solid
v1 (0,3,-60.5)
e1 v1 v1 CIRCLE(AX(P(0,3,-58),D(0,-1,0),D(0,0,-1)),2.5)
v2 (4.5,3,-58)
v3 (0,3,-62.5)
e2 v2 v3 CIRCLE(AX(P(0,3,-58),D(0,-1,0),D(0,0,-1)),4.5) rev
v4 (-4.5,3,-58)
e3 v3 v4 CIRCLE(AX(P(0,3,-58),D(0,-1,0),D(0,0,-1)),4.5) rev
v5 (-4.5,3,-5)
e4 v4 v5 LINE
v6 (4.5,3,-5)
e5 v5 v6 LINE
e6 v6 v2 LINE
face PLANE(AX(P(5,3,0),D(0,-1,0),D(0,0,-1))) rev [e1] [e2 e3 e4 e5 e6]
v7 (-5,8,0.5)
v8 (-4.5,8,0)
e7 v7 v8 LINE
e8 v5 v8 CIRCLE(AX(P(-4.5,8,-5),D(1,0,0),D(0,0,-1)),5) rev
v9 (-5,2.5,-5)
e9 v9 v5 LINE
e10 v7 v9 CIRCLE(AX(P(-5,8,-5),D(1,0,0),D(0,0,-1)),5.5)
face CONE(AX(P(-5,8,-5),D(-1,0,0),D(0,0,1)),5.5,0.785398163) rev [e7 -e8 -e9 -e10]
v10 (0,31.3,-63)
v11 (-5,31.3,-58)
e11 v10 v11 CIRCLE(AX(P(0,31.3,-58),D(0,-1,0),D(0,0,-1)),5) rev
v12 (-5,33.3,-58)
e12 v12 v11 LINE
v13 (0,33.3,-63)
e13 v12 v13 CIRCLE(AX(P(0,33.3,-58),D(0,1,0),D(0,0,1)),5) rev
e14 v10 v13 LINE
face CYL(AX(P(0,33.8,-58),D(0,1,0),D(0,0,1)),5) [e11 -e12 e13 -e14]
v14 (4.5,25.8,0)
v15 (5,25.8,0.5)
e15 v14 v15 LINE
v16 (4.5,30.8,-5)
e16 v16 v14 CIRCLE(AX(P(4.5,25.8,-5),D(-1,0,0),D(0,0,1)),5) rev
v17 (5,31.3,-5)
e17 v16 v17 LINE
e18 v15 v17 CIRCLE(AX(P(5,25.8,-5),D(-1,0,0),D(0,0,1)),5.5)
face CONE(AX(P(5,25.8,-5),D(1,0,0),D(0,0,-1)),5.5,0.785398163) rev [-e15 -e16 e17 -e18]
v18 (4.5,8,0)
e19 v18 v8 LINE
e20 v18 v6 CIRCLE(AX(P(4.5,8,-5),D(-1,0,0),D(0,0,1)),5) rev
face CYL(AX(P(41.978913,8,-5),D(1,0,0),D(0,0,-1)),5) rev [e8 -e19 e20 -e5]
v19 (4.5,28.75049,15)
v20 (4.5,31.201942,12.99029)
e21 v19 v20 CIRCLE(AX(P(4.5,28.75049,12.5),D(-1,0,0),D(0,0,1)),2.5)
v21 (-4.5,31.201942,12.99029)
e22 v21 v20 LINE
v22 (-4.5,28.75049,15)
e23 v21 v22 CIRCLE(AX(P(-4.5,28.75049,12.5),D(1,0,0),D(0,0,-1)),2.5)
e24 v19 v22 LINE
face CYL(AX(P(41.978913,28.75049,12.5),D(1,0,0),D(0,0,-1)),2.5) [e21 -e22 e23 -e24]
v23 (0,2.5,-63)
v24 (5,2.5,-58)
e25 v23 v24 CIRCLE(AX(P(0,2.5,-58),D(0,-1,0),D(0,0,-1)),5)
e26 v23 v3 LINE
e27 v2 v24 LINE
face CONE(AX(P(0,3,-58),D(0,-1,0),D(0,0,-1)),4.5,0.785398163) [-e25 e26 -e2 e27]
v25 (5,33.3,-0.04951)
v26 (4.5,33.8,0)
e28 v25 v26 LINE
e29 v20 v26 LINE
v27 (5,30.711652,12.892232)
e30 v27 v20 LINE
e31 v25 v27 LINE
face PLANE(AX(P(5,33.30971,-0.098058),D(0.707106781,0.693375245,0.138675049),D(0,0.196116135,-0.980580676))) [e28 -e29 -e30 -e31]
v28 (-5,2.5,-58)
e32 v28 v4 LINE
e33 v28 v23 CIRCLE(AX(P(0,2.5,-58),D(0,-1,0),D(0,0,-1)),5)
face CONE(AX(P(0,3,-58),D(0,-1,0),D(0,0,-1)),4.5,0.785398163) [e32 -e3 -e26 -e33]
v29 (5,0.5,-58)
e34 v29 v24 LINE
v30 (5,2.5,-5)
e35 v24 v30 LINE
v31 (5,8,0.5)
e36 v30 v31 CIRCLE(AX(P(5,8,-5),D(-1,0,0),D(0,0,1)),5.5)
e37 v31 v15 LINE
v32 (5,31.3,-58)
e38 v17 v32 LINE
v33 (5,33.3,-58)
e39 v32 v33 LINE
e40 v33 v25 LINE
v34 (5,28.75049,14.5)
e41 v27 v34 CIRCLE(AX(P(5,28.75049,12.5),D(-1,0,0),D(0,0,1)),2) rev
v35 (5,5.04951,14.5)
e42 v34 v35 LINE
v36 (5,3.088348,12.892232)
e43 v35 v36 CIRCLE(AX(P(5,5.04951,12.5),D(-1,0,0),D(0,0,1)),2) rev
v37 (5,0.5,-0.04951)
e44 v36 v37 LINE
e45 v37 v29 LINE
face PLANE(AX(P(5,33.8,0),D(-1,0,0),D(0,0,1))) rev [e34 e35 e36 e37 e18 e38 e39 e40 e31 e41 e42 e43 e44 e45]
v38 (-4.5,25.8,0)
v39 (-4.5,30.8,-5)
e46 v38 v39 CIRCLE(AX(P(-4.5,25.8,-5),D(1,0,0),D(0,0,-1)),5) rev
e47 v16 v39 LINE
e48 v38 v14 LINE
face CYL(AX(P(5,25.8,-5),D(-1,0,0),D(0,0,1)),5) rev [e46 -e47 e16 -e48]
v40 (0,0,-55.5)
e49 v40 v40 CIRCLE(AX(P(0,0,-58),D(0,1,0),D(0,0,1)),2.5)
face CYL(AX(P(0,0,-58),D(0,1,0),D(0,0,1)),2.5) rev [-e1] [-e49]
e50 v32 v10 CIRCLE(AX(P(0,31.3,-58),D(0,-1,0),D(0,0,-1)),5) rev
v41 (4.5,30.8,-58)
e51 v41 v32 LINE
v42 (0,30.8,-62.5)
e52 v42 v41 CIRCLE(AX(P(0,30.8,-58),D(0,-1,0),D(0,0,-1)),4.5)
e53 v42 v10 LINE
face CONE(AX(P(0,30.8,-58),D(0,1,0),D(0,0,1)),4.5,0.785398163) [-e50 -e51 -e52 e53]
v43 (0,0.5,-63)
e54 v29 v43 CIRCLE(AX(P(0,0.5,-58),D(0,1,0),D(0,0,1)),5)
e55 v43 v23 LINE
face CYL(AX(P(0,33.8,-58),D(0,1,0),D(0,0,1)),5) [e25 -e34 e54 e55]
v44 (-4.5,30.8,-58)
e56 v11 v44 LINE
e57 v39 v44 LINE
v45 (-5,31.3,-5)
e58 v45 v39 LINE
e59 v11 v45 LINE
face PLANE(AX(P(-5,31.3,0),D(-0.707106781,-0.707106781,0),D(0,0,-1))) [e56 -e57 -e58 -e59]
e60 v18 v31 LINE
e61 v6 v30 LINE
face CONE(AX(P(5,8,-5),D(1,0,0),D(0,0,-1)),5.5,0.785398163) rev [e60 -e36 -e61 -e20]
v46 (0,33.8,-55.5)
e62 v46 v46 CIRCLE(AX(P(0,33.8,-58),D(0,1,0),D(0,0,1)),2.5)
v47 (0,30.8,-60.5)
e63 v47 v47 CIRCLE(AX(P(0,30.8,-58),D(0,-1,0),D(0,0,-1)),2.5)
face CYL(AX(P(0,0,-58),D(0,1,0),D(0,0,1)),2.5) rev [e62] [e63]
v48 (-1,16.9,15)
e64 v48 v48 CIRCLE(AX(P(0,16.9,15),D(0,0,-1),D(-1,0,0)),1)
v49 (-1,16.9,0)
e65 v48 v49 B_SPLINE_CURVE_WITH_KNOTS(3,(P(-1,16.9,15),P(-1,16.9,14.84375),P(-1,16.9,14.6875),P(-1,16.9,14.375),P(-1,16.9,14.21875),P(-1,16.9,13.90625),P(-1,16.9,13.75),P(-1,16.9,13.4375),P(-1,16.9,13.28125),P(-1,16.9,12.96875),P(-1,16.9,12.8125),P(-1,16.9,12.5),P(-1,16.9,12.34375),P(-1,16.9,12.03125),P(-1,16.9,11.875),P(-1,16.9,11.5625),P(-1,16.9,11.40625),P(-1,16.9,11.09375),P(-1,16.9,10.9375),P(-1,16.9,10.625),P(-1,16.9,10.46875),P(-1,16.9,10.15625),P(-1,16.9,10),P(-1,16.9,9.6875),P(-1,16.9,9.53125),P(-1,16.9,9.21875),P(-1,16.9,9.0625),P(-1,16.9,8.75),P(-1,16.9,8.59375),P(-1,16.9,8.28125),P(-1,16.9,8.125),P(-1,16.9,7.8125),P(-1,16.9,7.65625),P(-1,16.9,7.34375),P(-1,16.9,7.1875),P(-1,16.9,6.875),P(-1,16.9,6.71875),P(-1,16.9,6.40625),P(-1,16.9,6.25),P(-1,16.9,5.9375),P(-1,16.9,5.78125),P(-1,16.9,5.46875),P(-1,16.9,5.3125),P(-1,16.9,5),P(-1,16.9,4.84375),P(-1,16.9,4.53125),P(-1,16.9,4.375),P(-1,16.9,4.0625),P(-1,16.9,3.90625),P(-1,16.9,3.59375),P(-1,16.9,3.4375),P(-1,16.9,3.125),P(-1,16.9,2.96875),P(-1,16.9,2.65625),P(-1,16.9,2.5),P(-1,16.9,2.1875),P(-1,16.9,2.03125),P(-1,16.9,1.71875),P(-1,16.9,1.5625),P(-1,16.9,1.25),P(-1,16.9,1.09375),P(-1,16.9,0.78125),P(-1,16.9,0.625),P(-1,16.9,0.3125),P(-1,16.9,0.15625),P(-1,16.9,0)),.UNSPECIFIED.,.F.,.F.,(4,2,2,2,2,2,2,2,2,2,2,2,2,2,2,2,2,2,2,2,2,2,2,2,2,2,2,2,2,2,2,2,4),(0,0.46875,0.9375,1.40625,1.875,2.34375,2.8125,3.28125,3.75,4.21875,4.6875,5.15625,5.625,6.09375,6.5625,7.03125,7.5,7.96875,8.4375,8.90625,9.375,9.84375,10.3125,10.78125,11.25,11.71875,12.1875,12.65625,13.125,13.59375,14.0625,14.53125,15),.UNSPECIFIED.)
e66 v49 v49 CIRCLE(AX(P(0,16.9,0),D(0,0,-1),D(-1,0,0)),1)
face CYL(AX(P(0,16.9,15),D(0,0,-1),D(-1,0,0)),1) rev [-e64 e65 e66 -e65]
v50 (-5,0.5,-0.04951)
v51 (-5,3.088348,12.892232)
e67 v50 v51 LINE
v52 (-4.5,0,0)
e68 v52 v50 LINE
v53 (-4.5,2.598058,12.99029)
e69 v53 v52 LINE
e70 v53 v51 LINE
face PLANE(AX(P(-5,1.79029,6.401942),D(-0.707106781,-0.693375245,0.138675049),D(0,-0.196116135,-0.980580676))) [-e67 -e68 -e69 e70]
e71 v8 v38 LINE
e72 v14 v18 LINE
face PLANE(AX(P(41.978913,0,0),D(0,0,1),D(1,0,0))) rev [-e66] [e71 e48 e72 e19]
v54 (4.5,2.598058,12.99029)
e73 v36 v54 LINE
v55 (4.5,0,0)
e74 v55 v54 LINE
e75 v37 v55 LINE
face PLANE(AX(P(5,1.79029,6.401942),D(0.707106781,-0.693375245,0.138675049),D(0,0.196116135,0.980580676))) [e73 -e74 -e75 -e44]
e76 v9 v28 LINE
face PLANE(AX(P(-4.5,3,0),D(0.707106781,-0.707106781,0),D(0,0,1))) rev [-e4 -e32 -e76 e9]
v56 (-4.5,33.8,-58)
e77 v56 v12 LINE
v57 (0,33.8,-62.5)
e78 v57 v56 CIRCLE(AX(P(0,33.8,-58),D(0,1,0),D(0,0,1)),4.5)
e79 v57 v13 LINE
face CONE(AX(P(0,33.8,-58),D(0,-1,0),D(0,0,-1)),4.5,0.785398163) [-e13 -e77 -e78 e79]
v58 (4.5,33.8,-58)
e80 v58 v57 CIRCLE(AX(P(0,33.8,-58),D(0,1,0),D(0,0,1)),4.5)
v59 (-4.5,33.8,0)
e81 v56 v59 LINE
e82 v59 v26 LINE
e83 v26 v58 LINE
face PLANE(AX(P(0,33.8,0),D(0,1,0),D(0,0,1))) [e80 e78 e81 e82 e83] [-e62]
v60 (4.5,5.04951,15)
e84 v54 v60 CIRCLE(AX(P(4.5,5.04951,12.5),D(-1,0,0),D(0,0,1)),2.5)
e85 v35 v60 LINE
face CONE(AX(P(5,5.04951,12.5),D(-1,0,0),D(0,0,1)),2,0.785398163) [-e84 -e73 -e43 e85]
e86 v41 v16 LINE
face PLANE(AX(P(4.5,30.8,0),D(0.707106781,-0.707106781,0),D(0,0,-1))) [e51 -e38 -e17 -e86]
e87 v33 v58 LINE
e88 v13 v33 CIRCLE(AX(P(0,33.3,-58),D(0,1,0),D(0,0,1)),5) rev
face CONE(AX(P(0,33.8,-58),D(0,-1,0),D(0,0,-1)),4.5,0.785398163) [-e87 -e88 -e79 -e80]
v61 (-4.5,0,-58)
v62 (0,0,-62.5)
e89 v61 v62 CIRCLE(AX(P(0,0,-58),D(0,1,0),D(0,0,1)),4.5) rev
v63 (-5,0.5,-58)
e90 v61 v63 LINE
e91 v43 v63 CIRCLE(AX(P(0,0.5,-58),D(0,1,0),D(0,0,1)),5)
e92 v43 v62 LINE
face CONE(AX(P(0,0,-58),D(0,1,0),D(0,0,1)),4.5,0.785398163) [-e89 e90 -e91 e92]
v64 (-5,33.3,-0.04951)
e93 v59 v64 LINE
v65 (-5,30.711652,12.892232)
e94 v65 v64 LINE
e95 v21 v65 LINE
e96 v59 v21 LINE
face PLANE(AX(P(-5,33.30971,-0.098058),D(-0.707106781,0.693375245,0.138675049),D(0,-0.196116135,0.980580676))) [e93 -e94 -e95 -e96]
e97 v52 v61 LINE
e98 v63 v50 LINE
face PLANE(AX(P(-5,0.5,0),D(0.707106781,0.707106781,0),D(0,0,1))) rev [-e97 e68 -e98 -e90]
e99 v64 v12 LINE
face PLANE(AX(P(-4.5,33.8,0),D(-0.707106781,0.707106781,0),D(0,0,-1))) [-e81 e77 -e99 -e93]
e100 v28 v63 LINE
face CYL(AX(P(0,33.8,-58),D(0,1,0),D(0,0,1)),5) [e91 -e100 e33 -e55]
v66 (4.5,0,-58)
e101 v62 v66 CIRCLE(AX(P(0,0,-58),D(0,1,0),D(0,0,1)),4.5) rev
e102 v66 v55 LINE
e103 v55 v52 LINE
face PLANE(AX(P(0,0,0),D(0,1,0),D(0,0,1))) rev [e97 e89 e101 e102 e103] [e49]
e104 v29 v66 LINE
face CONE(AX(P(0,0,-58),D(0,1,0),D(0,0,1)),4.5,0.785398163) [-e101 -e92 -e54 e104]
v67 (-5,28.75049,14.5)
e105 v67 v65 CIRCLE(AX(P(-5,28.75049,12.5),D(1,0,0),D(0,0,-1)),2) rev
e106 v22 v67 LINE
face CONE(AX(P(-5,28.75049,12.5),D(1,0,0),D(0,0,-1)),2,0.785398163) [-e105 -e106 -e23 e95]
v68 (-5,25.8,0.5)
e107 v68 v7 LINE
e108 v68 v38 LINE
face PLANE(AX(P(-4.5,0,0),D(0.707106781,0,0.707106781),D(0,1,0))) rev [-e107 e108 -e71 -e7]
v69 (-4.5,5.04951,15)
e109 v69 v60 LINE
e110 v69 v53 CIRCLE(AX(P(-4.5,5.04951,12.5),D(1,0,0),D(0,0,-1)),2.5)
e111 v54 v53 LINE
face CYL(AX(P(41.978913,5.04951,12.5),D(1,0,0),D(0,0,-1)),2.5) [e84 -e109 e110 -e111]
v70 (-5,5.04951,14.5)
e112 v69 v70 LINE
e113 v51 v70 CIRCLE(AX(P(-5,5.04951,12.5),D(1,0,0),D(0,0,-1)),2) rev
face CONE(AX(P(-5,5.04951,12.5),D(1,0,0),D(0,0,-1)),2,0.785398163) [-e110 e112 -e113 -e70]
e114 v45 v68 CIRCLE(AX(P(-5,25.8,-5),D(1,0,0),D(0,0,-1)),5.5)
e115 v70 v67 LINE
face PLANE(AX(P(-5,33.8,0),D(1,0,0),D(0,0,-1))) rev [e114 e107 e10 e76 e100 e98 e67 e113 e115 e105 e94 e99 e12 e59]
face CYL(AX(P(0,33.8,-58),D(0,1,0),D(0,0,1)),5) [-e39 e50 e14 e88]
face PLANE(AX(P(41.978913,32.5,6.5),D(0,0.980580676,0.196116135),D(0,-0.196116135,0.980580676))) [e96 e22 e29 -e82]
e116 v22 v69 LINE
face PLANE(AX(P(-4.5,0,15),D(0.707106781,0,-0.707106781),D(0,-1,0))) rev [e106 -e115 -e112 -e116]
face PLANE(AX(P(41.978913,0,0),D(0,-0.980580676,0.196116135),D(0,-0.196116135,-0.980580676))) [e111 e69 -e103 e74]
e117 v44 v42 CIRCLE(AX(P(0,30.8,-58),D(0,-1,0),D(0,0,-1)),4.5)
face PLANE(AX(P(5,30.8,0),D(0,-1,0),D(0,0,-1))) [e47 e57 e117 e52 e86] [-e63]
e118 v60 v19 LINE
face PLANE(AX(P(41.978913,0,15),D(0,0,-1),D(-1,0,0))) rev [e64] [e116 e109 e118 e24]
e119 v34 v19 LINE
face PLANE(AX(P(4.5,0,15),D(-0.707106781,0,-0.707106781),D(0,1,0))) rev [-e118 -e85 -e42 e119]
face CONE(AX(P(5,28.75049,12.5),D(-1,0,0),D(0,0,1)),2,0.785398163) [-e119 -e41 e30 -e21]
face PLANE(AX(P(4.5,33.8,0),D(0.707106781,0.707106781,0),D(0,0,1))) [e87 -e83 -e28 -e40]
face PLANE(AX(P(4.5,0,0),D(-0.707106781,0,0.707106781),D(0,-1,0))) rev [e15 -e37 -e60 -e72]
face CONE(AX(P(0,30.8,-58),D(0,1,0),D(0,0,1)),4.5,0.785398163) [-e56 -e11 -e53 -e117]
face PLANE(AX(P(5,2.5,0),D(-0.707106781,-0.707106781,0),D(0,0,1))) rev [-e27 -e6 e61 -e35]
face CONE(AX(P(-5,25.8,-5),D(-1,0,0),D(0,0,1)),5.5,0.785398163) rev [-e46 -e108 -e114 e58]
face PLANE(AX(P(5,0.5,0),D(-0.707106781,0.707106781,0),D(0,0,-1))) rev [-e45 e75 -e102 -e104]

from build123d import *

# Parameters (mm, degrees)
EXTRUDE_2_DEPTH     = 33.8
SKETCH_2_W          = 63
SKETCH_2_H          = 27.8
CUT_EXTRUDE_2_DEPTH = 73.190304058
SKETCH_4_W          = 15
SKETCH_4_H          = 13.9
EXTRUDE_4_DEPTH     = 10
FILLET_1_R          = 5
FILLET_2_R          = 5
FILLET_3_R          = 2.5
SKETCH_5_R          = 2.5
CUT_EXTRUDE_3_DEPTH = 72.668961204
SKETCH_6_R          = 1
CUT_EXTRUDE_4_DEPTH = 72.668961204
CHAMFER_2_SIZE      = 0.5


with BuildPart() as part:
    # ｽｹｯﾁ1 → ﾎﾞｽ - 押し出し2 (new body)
    with BuildSketch(Plane(origin=(0, 0, 0), x_dir=(1, 0, 0), z_dir=(0, 1, 0))):
        with BuildLine():
            Line((-5, 0), (0, 0))
            Line((0, 0), (0, 58))
            Line((0, 58), (0, 63))
            ThreePointArc((0, 63), (-3.535533906, 61.535533906), (-5, 58))
            Line((-5, 58), (-5, 0))
        make_face()
        with BuildLine():
            Line((0, 58), (0, 0))
            Line((0, 0), (5, 0))
            Line((5, 0), (5, 58))
            ThreePointArc((5, 58), (3.535533906, 61.535533906), (0, 63))
            Line((0, 63), (0, 58))
        make_face()
        with BuildLine():
            ThreePointArc((-5, 58), (-3.535533906, 61.535533906), (0, 63))
            Line((0, 63), (-5, 63))
            Line((-5, 63), (-5, 58))
        make_face()
        with BuildLine():
            Line((5, 63), (0, 63))
            ThreePointArc((0, 63), (3.535533906, 61.535533906), (5, 58))
            Line((5, 58), (5, 63))
        make_face()
    extrude(amount=EXTRUDE_2_DEPTH)

    # ｽｹｯﾁ2 → ｶｯﾄ - 押し出し2 (cut, through all)
    with BuildSketch(Plane.ZY.offset(5)):
        with Locations((-31.5, 16.9)):
            Rectangle(SKETCH_2_W, SKETCH_2_H)
    extrude(amount=-CUT_EXTRUDE_2_DEPTH, mode=Mode.SUBTRACT)


with BuildPart() as cut_extrude_2_piece_1:
    # of the separate pieces the step leaves, piece 1, a body of its own (cut_extrude_2_pieces)
    add(part.part.solids().sort_by_distance((-5, 30.8, 0))[0])



with BuildPart() as cut_extrude_2_piece_2:
    # of the separate pieces the step leaves, piece 2, a body of its own (cut_extrude_2_pieces)
    add(part.part.solids().sort_by_distance((-5, 0, 0))[0])


with BuildPart() as cut_extrude_2_piece_1_1:
    add(cut_extrude_2_piece_1.part)

    add(cut_extrude_2_piece_2.part)  # ﾎﾞｽ - 押し出し4 merges ｶｯﾄ - 押し出し2 piece 2
    # ｽｹｯﾁ4 → ﾎﾞｽ - 押し出し4 (add)
    with BuildSketch(Plane.ZY.offset(5)):
        Polygon((0, 3), (0, 0), (15, 3), align=None)
        with Locations((7.5, 9.95)):
            Rectangle(SKETCH_4_W, SKETCH_4_H)
        with Locations((7.5, 23.85)):
            Rectangle(SKETCH_4_W, SKETCH_4_H)
        Polygon((0, 33.8), (0, 30.8), (15, 30.8), align=None)
    extrude(amount=-EXTRUDE_4_DEPTH)

    # ﾌｨﾚｯﾄ1
    fillet_1_edges = [cut_extrude_2_piece_1_1.edges().sort_by_distance(p)[0] for p in [
        (5, 1.5, -63),
        (-5, 1.5, -63),
        (5, 32.3, -63),
        (-5, 32.3, -63),
    ]]
    fillet(fillet_1_edges, radius=FILLET_1_R - 0.0001)  # a hair under: the kernel refuses the full size

    # ﾌｨﾚｯﾄ2
    fillet_2_edges = [cut_extrude_2_piece_1_1.edges().sort_by_distance(p)[0] for p in [
        (0, 30.8, 0),
        (0, 3, 0),
    ]]
    fillet(fillet_2_edges, radius=FILLET_2_R)

    # ﾌｨﾚｯﾄ3
    fillet_3_edges = [cut_extrude_2_piece_1_1.edges().sort_by_distance(p)[0] for p in [
        (0, 30.8, 15),
        (0, 3, 15),
    ]]
    fillet(fillet_3_edges, radius=FILLET_3_R)

    # ｽｹｯﾁ5 → ｶｯﾄ - 押し出し3 (cut, through all)
    with BuildSketch(Plane(origin=(0, 33.8, 0), x_dir=(1, 0, 0), z_dir=(0, 1, 0))):
        with Locations(Location((0, 58, 0), (0, 0, 270))):
            Circle(SKETCH_5_R)
    extrude(amount=-CUT_EXTRUDE_3_DEPTH, mode=Mode.SUBTRACT)

    # ｽｹｯﾁ6 → ｶｯﾄ - 押し出し4 (cut, through all)
    with BuildSketch(Plane(origin=(0, 0, 0), x_dir=(-1, 0, 0), z_dir=(0, 0, -1))):
        with Locations((0, 16.9)):
            Circle(SKETCH_6_R)
    extrude(amount=-CUT_EXTRUDE_4_DEPTH, mode=Mode.SUBTRACT)

    # 面取り2
    chamfer_2_edges = [cut_extrude_2_piece_1_1.edges().sort_by_distance(p)[0] for p in [
        (-5, 1.299029034, 6.495145169),
        (5, 32.500970966, 6.495145169),
        (5, 33.8, -29.00005),
        (5, 0, -29.00005),
        (-5, 0, -29.00005),
        (-3.535563195, 0, -61.535563195),
        (3.535563195, 0, -61.535563195),
        (5, 30.8, -31.50005),
        (5, 3, -31.50005),
        (-5, 3, -31.50005),
        (-3.535563195, 3, -61.535563195),
        (3.535563195, 3, -61.535563195),
        (-5, 30.8, -31.50005),
        (-5, 33.8, -29.00005),
        (-3.535563195, 30.8, -61.535563195),
        (3.535563195, 30.8, -61.535563195),
        (-3.535563195, 33.8, -61.535563195),
        (3.535563195, 33.8, -61.535563195),
        (-5, 16.9, 0),
        (5, 16.9, 0),
        (-5, 29.335533906, -1.464466094),
        (5, 29.335533906, -1.464466094),
        (-5, 4.464466094, -1.464466094),
        (5, 4.464466094, -1.464466094),
        (5, 16.9, 15),
        (-5, 16.9, 15),
        (-5, 32.500970966, 6.495145169),
        (-5, 3.464537493, 14.433355353),
        (-5, 30.335462507, 14.433355353),
        (5, 1.299029034, 6.495145169),
        (5, 3.464537493, 14.433355353),
        (5, 30.335462507, 14.433355353),
    ]]
    chamfer(chamfer_2_edges, length=CHAMFER_2_SIZE)


solid = cut_extrude_2_piece_1_1.part
